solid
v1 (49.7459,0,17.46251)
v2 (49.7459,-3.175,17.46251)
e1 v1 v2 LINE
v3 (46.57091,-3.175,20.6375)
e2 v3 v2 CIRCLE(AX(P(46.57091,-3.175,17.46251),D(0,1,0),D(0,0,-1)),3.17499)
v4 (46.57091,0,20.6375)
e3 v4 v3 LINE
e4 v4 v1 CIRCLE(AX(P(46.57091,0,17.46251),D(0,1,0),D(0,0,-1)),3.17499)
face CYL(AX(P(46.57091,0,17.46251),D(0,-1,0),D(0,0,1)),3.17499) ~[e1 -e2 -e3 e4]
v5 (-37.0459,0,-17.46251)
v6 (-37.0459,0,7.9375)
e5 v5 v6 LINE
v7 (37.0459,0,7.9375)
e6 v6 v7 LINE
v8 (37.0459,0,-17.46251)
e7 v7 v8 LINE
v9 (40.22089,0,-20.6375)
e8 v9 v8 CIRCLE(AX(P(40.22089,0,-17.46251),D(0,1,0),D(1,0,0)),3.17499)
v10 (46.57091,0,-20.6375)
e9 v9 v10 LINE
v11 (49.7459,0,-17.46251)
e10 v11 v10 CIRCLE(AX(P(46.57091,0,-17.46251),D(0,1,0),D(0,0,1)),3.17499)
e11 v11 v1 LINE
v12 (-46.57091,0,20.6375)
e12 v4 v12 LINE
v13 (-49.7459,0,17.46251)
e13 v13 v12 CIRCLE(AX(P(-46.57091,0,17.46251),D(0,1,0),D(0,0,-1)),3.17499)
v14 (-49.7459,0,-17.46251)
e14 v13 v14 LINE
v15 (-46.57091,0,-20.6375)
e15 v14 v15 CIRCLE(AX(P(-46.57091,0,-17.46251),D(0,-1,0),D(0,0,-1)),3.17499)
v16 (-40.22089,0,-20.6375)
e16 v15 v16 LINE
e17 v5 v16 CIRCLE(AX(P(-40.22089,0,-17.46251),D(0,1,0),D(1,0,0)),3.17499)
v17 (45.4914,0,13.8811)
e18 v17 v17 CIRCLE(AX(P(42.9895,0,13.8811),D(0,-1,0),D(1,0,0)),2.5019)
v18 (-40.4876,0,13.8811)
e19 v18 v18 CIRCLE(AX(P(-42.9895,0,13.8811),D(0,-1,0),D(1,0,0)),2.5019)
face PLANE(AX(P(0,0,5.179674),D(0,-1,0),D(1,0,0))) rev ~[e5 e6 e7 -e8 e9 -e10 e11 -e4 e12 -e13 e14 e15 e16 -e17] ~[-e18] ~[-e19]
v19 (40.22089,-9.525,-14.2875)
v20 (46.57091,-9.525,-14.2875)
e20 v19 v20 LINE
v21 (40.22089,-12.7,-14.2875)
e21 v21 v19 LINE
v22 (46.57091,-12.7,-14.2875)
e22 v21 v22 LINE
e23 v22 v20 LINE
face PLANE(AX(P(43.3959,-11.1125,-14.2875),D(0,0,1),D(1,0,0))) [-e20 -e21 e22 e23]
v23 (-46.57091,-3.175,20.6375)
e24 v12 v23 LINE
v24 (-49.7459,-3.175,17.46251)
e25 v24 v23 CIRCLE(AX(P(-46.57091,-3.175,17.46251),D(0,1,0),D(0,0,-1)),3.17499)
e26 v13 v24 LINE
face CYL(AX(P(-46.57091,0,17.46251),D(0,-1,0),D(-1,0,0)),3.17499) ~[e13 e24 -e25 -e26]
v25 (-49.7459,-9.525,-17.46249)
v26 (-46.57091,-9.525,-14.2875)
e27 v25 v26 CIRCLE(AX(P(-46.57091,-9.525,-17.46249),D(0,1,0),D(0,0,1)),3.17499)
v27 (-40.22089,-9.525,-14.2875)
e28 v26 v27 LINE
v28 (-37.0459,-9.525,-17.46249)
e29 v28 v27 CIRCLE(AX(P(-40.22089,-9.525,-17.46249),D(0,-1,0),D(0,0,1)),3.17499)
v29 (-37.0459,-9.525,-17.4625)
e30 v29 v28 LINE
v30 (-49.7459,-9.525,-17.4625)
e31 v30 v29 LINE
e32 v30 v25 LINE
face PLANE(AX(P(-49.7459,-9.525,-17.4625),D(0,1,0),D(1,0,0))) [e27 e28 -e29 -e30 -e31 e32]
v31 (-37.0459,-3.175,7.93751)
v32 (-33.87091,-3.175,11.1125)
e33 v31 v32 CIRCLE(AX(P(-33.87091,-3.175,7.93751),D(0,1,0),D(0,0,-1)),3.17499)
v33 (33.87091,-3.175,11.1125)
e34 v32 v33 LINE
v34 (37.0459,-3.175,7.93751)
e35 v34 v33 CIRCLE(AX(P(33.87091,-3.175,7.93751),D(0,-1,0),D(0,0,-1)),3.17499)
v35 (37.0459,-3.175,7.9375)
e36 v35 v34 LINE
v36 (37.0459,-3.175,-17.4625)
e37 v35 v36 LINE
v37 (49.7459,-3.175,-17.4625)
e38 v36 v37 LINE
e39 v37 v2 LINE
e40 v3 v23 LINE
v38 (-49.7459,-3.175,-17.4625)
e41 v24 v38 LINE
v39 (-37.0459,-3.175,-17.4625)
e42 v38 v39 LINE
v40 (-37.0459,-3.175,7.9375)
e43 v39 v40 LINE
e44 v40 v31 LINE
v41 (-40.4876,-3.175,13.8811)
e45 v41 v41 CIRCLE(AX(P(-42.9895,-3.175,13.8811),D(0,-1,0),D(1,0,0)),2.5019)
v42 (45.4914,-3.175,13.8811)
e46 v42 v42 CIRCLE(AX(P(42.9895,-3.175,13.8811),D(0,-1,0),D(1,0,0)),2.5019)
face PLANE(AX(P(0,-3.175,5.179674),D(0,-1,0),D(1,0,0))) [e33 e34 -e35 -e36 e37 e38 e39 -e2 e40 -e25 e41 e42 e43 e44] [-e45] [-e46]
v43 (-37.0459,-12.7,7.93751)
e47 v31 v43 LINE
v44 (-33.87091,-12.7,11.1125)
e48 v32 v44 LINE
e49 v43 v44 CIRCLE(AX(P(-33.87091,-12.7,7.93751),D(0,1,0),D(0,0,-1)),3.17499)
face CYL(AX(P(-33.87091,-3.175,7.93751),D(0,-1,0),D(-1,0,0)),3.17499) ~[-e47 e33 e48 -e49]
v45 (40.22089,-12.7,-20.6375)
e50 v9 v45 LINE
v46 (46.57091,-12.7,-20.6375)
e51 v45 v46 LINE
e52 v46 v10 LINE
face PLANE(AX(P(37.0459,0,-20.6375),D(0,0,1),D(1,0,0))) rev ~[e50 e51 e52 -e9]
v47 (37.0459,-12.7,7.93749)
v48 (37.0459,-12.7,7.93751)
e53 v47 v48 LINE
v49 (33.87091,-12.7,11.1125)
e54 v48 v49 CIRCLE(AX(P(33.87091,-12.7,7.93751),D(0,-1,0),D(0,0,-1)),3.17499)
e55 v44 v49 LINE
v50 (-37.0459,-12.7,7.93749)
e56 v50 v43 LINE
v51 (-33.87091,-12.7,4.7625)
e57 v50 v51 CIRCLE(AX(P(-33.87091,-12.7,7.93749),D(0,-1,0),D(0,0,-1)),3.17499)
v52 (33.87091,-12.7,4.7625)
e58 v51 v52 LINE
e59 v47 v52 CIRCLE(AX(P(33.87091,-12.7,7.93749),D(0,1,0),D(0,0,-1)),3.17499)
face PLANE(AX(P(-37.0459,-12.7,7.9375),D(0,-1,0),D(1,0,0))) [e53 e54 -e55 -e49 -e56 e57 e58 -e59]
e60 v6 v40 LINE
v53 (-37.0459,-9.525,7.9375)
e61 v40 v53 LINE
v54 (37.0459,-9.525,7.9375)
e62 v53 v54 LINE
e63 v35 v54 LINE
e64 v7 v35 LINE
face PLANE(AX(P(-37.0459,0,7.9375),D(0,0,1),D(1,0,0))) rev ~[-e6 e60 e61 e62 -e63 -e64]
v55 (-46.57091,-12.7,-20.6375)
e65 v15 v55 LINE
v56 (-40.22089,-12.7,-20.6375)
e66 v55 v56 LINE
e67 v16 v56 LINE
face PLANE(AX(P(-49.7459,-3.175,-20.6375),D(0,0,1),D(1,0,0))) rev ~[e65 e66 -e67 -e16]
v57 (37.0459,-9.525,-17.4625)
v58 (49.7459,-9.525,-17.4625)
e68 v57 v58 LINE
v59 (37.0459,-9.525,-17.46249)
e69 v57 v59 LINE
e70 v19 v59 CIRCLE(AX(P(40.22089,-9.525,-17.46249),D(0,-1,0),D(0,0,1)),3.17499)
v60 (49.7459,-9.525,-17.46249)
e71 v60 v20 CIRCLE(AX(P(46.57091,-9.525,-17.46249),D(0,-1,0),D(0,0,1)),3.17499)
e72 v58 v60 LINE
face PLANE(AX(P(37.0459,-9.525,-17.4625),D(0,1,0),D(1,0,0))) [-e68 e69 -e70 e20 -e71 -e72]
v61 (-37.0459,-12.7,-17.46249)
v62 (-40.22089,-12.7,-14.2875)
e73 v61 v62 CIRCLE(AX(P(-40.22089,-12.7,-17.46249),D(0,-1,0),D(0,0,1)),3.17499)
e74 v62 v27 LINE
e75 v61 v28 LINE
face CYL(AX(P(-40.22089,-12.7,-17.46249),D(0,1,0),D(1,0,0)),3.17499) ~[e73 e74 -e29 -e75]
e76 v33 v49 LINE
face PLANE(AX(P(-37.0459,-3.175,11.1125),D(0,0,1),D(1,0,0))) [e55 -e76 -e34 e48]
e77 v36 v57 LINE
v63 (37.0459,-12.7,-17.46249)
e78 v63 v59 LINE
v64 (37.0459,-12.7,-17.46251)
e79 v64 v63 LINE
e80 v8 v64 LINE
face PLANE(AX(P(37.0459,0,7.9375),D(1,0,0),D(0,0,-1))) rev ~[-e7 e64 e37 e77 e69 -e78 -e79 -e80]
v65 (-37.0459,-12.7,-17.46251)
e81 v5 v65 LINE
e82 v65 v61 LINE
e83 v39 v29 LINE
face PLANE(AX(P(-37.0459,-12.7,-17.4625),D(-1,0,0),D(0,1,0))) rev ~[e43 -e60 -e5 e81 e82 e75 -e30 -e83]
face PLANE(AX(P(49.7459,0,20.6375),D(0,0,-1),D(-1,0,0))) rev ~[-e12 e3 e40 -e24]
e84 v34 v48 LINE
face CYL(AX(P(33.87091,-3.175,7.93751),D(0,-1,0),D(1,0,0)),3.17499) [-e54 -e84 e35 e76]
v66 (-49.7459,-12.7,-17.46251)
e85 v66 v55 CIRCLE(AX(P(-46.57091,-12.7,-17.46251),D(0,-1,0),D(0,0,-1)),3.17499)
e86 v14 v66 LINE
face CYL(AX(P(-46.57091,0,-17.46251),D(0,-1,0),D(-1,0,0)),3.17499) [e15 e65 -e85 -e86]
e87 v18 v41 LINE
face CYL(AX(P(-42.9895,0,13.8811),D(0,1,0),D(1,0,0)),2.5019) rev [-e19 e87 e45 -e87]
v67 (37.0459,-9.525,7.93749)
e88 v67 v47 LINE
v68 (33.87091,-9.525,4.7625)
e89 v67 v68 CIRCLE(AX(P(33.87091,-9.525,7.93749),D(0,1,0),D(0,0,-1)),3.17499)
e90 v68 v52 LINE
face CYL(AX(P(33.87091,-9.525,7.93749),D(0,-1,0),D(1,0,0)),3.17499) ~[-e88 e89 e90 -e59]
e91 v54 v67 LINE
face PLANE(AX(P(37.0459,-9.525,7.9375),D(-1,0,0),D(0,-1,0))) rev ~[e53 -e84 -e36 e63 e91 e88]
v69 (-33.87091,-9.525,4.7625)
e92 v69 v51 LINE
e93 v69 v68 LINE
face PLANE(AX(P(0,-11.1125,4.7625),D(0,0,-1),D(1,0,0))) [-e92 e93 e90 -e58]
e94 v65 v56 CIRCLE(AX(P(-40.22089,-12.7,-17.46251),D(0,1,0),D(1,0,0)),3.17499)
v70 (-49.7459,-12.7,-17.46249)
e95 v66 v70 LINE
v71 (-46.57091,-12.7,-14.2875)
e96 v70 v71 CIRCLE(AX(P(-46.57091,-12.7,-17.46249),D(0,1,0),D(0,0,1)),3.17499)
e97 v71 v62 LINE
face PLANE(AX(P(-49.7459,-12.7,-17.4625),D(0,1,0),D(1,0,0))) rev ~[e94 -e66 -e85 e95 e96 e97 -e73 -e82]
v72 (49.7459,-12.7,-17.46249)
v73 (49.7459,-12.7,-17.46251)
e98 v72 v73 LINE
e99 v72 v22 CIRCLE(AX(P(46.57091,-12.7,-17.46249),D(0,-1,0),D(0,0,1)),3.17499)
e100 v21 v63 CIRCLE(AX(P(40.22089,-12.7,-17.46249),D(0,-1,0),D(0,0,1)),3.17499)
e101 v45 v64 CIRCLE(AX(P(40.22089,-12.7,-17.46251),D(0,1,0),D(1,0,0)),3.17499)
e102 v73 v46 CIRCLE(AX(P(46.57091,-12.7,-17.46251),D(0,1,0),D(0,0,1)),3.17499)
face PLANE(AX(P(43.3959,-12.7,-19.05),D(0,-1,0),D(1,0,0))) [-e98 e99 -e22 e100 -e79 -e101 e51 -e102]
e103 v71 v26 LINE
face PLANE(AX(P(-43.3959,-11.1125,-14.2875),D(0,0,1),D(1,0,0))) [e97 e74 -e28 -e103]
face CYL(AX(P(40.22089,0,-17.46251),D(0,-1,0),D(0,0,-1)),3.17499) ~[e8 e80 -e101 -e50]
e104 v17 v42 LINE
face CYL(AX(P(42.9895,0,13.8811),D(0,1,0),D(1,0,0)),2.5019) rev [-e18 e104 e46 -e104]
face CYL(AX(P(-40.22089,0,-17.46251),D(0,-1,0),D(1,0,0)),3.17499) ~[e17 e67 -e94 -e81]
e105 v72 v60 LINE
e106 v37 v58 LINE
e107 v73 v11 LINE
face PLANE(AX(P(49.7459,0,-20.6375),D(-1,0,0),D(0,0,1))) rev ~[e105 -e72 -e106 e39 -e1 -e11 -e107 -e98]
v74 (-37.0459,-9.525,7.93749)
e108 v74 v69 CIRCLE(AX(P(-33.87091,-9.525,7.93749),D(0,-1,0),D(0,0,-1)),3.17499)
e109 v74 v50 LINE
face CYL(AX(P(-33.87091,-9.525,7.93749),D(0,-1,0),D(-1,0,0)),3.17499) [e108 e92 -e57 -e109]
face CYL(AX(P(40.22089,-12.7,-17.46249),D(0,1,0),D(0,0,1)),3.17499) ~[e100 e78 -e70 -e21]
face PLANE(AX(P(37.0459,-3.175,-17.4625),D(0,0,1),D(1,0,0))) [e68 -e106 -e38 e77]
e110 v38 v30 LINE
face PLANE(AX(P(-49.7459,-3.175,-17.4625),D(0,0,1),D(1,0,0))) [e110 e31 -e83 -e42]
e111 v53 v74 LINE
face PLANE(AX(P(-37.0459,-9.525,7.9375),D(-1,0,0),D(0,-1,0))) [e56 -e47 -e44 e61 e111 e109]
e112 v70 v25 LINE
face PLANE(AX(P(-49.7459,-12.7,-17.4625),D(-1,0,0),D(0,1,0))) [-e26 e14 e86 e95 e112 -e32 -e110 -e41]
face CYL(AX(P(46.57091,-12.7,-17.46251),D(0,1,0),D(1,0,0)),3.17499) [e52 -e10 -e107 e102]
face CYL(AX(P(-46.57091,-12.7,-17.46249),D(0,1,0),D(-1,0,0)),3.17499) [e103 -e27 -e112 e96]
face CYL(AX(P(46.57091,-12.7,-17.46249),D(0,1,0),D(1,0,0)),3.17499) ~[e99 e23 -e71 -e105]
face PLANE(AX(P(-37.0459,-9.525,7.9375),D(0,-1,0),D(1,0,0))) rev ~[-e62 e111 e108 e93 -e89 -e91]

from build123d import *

# Parameters (mm, degrees)
F0_R     = 2.5019
F1_DEPTH = 3.175
F2_W     = 12.7
F2_H     = 3.175
F2_W_2   = 74.0918
F3_DEPTH = 9.525
F4_W     = 12.7
F4_H     = 3.175
F5_W     = 12.7
F5_H     = 3.175
F6_DEPTH = 3.175
F7_W     = 74.0918
F7_H     = 3.175
F8_DEPTH = 3.175
F9_R     = 3.17499


# Not quite as in the source:
# - a fillet or chamfer is up to 0.001 mm smaller than in the source, because OpenCascade refuses the exact size
# - a feature names something its author has since deleted; it is built from what else it names


with BuildPart() as f1:
    # F0 (on Front) → F1 (new body)
    with BuildSketch(Plane.XZ):
        Polygon((49.7459, 20.6375), (-49.7459, 20.6375), (-49.7459, -20.6375), (-37.0459, -20.6375), (-37.0459, 7.9375), (37.0459, 7.9375), (37.0459, -20.6375), (49.7459, -20.6375), align=None)
        with Locations((-42.9895, 13.8811)):
            Circle(F0_R, mode=Mode.SUBTRACT)
        with Locations((42.9895, 13.8811)):
            Circle(F0_R, mode=Mode.SUBTRACT)
    extrude(amount=F1_DEPTH)

    # F2 (on face) → F3 (join)
    with BuildSketch(Plane.XZ.offset(3.175)):
        with Locations((-43.3959, -19.05)):
            Rectangle(F2_W, F2_H)
        with Locations((0, 9.525)):
            Rectangle(F2_W_2, F2_H)
        with Locations((43.3959, -19.05)):
            Rectangle(F2_W, F2_H)
    extrude(amount=F3_DEPTH)

    # F4 (on face) + F5 (on face) → F6 (join)
    with BuildSketch(Plane.XY.offset(-17.4625)):
        with Locations((-43.3959, -11.1125)):
            Rectangle(F4_W, F4_H)
    with BuildSketch(Plane.XY.offset(-17.4625)):
        with Locations((43.3959, -11.1125)):
            Rectangle(F5_W, F5_H)
    extrude(amount=F6_DEPTH)

    # F7 (on face) → F8 (join)
    with BuildSketch(Plane(origin=(0, 0, 7.9375), x_dir=(1, 0, 0), z_dir=(0, 0, -1))):
        with Locations((0, 11.1125)):
            Rectangle(F7_W, F7_H)
    extrude(amount=F8_DEPTH)

    # F9 (radius 3.175 in the source; OpenCascade refuses exactly that, so slightly less here)
    f9_edges = [f1.edges().sort_by_distance(p)[0] for p in [
        (-49.7459, -1.5875, 20.6375),
        (-49.7459, -6.35, -20.6375),
        (-49.7459, -11.1125, -14.2875),
        (-37.0459, -7.9375, 11.1125),
        (-37.0459, -11.1125, 4.7625),
        (-37.0459, -11.1125, -14.2875),
        (-37.0459, -6.35, -20.6375),
        (49.7459, -1.5875, 20.6375),
        (49.7459, -6.35, -20.6375),
        (37.0459, -7.9375, 11.1125),
        (37.0459, -11.1125, 4.7625),
        (37.0459, -11.1125, -14.2875),
        (37.0459, -6.35, -20.6375),
        (49.7459, -11.1125, -14.2875),
    ]]
    fillet(f9_edges, radius=F9_R)


solid = f1.part
